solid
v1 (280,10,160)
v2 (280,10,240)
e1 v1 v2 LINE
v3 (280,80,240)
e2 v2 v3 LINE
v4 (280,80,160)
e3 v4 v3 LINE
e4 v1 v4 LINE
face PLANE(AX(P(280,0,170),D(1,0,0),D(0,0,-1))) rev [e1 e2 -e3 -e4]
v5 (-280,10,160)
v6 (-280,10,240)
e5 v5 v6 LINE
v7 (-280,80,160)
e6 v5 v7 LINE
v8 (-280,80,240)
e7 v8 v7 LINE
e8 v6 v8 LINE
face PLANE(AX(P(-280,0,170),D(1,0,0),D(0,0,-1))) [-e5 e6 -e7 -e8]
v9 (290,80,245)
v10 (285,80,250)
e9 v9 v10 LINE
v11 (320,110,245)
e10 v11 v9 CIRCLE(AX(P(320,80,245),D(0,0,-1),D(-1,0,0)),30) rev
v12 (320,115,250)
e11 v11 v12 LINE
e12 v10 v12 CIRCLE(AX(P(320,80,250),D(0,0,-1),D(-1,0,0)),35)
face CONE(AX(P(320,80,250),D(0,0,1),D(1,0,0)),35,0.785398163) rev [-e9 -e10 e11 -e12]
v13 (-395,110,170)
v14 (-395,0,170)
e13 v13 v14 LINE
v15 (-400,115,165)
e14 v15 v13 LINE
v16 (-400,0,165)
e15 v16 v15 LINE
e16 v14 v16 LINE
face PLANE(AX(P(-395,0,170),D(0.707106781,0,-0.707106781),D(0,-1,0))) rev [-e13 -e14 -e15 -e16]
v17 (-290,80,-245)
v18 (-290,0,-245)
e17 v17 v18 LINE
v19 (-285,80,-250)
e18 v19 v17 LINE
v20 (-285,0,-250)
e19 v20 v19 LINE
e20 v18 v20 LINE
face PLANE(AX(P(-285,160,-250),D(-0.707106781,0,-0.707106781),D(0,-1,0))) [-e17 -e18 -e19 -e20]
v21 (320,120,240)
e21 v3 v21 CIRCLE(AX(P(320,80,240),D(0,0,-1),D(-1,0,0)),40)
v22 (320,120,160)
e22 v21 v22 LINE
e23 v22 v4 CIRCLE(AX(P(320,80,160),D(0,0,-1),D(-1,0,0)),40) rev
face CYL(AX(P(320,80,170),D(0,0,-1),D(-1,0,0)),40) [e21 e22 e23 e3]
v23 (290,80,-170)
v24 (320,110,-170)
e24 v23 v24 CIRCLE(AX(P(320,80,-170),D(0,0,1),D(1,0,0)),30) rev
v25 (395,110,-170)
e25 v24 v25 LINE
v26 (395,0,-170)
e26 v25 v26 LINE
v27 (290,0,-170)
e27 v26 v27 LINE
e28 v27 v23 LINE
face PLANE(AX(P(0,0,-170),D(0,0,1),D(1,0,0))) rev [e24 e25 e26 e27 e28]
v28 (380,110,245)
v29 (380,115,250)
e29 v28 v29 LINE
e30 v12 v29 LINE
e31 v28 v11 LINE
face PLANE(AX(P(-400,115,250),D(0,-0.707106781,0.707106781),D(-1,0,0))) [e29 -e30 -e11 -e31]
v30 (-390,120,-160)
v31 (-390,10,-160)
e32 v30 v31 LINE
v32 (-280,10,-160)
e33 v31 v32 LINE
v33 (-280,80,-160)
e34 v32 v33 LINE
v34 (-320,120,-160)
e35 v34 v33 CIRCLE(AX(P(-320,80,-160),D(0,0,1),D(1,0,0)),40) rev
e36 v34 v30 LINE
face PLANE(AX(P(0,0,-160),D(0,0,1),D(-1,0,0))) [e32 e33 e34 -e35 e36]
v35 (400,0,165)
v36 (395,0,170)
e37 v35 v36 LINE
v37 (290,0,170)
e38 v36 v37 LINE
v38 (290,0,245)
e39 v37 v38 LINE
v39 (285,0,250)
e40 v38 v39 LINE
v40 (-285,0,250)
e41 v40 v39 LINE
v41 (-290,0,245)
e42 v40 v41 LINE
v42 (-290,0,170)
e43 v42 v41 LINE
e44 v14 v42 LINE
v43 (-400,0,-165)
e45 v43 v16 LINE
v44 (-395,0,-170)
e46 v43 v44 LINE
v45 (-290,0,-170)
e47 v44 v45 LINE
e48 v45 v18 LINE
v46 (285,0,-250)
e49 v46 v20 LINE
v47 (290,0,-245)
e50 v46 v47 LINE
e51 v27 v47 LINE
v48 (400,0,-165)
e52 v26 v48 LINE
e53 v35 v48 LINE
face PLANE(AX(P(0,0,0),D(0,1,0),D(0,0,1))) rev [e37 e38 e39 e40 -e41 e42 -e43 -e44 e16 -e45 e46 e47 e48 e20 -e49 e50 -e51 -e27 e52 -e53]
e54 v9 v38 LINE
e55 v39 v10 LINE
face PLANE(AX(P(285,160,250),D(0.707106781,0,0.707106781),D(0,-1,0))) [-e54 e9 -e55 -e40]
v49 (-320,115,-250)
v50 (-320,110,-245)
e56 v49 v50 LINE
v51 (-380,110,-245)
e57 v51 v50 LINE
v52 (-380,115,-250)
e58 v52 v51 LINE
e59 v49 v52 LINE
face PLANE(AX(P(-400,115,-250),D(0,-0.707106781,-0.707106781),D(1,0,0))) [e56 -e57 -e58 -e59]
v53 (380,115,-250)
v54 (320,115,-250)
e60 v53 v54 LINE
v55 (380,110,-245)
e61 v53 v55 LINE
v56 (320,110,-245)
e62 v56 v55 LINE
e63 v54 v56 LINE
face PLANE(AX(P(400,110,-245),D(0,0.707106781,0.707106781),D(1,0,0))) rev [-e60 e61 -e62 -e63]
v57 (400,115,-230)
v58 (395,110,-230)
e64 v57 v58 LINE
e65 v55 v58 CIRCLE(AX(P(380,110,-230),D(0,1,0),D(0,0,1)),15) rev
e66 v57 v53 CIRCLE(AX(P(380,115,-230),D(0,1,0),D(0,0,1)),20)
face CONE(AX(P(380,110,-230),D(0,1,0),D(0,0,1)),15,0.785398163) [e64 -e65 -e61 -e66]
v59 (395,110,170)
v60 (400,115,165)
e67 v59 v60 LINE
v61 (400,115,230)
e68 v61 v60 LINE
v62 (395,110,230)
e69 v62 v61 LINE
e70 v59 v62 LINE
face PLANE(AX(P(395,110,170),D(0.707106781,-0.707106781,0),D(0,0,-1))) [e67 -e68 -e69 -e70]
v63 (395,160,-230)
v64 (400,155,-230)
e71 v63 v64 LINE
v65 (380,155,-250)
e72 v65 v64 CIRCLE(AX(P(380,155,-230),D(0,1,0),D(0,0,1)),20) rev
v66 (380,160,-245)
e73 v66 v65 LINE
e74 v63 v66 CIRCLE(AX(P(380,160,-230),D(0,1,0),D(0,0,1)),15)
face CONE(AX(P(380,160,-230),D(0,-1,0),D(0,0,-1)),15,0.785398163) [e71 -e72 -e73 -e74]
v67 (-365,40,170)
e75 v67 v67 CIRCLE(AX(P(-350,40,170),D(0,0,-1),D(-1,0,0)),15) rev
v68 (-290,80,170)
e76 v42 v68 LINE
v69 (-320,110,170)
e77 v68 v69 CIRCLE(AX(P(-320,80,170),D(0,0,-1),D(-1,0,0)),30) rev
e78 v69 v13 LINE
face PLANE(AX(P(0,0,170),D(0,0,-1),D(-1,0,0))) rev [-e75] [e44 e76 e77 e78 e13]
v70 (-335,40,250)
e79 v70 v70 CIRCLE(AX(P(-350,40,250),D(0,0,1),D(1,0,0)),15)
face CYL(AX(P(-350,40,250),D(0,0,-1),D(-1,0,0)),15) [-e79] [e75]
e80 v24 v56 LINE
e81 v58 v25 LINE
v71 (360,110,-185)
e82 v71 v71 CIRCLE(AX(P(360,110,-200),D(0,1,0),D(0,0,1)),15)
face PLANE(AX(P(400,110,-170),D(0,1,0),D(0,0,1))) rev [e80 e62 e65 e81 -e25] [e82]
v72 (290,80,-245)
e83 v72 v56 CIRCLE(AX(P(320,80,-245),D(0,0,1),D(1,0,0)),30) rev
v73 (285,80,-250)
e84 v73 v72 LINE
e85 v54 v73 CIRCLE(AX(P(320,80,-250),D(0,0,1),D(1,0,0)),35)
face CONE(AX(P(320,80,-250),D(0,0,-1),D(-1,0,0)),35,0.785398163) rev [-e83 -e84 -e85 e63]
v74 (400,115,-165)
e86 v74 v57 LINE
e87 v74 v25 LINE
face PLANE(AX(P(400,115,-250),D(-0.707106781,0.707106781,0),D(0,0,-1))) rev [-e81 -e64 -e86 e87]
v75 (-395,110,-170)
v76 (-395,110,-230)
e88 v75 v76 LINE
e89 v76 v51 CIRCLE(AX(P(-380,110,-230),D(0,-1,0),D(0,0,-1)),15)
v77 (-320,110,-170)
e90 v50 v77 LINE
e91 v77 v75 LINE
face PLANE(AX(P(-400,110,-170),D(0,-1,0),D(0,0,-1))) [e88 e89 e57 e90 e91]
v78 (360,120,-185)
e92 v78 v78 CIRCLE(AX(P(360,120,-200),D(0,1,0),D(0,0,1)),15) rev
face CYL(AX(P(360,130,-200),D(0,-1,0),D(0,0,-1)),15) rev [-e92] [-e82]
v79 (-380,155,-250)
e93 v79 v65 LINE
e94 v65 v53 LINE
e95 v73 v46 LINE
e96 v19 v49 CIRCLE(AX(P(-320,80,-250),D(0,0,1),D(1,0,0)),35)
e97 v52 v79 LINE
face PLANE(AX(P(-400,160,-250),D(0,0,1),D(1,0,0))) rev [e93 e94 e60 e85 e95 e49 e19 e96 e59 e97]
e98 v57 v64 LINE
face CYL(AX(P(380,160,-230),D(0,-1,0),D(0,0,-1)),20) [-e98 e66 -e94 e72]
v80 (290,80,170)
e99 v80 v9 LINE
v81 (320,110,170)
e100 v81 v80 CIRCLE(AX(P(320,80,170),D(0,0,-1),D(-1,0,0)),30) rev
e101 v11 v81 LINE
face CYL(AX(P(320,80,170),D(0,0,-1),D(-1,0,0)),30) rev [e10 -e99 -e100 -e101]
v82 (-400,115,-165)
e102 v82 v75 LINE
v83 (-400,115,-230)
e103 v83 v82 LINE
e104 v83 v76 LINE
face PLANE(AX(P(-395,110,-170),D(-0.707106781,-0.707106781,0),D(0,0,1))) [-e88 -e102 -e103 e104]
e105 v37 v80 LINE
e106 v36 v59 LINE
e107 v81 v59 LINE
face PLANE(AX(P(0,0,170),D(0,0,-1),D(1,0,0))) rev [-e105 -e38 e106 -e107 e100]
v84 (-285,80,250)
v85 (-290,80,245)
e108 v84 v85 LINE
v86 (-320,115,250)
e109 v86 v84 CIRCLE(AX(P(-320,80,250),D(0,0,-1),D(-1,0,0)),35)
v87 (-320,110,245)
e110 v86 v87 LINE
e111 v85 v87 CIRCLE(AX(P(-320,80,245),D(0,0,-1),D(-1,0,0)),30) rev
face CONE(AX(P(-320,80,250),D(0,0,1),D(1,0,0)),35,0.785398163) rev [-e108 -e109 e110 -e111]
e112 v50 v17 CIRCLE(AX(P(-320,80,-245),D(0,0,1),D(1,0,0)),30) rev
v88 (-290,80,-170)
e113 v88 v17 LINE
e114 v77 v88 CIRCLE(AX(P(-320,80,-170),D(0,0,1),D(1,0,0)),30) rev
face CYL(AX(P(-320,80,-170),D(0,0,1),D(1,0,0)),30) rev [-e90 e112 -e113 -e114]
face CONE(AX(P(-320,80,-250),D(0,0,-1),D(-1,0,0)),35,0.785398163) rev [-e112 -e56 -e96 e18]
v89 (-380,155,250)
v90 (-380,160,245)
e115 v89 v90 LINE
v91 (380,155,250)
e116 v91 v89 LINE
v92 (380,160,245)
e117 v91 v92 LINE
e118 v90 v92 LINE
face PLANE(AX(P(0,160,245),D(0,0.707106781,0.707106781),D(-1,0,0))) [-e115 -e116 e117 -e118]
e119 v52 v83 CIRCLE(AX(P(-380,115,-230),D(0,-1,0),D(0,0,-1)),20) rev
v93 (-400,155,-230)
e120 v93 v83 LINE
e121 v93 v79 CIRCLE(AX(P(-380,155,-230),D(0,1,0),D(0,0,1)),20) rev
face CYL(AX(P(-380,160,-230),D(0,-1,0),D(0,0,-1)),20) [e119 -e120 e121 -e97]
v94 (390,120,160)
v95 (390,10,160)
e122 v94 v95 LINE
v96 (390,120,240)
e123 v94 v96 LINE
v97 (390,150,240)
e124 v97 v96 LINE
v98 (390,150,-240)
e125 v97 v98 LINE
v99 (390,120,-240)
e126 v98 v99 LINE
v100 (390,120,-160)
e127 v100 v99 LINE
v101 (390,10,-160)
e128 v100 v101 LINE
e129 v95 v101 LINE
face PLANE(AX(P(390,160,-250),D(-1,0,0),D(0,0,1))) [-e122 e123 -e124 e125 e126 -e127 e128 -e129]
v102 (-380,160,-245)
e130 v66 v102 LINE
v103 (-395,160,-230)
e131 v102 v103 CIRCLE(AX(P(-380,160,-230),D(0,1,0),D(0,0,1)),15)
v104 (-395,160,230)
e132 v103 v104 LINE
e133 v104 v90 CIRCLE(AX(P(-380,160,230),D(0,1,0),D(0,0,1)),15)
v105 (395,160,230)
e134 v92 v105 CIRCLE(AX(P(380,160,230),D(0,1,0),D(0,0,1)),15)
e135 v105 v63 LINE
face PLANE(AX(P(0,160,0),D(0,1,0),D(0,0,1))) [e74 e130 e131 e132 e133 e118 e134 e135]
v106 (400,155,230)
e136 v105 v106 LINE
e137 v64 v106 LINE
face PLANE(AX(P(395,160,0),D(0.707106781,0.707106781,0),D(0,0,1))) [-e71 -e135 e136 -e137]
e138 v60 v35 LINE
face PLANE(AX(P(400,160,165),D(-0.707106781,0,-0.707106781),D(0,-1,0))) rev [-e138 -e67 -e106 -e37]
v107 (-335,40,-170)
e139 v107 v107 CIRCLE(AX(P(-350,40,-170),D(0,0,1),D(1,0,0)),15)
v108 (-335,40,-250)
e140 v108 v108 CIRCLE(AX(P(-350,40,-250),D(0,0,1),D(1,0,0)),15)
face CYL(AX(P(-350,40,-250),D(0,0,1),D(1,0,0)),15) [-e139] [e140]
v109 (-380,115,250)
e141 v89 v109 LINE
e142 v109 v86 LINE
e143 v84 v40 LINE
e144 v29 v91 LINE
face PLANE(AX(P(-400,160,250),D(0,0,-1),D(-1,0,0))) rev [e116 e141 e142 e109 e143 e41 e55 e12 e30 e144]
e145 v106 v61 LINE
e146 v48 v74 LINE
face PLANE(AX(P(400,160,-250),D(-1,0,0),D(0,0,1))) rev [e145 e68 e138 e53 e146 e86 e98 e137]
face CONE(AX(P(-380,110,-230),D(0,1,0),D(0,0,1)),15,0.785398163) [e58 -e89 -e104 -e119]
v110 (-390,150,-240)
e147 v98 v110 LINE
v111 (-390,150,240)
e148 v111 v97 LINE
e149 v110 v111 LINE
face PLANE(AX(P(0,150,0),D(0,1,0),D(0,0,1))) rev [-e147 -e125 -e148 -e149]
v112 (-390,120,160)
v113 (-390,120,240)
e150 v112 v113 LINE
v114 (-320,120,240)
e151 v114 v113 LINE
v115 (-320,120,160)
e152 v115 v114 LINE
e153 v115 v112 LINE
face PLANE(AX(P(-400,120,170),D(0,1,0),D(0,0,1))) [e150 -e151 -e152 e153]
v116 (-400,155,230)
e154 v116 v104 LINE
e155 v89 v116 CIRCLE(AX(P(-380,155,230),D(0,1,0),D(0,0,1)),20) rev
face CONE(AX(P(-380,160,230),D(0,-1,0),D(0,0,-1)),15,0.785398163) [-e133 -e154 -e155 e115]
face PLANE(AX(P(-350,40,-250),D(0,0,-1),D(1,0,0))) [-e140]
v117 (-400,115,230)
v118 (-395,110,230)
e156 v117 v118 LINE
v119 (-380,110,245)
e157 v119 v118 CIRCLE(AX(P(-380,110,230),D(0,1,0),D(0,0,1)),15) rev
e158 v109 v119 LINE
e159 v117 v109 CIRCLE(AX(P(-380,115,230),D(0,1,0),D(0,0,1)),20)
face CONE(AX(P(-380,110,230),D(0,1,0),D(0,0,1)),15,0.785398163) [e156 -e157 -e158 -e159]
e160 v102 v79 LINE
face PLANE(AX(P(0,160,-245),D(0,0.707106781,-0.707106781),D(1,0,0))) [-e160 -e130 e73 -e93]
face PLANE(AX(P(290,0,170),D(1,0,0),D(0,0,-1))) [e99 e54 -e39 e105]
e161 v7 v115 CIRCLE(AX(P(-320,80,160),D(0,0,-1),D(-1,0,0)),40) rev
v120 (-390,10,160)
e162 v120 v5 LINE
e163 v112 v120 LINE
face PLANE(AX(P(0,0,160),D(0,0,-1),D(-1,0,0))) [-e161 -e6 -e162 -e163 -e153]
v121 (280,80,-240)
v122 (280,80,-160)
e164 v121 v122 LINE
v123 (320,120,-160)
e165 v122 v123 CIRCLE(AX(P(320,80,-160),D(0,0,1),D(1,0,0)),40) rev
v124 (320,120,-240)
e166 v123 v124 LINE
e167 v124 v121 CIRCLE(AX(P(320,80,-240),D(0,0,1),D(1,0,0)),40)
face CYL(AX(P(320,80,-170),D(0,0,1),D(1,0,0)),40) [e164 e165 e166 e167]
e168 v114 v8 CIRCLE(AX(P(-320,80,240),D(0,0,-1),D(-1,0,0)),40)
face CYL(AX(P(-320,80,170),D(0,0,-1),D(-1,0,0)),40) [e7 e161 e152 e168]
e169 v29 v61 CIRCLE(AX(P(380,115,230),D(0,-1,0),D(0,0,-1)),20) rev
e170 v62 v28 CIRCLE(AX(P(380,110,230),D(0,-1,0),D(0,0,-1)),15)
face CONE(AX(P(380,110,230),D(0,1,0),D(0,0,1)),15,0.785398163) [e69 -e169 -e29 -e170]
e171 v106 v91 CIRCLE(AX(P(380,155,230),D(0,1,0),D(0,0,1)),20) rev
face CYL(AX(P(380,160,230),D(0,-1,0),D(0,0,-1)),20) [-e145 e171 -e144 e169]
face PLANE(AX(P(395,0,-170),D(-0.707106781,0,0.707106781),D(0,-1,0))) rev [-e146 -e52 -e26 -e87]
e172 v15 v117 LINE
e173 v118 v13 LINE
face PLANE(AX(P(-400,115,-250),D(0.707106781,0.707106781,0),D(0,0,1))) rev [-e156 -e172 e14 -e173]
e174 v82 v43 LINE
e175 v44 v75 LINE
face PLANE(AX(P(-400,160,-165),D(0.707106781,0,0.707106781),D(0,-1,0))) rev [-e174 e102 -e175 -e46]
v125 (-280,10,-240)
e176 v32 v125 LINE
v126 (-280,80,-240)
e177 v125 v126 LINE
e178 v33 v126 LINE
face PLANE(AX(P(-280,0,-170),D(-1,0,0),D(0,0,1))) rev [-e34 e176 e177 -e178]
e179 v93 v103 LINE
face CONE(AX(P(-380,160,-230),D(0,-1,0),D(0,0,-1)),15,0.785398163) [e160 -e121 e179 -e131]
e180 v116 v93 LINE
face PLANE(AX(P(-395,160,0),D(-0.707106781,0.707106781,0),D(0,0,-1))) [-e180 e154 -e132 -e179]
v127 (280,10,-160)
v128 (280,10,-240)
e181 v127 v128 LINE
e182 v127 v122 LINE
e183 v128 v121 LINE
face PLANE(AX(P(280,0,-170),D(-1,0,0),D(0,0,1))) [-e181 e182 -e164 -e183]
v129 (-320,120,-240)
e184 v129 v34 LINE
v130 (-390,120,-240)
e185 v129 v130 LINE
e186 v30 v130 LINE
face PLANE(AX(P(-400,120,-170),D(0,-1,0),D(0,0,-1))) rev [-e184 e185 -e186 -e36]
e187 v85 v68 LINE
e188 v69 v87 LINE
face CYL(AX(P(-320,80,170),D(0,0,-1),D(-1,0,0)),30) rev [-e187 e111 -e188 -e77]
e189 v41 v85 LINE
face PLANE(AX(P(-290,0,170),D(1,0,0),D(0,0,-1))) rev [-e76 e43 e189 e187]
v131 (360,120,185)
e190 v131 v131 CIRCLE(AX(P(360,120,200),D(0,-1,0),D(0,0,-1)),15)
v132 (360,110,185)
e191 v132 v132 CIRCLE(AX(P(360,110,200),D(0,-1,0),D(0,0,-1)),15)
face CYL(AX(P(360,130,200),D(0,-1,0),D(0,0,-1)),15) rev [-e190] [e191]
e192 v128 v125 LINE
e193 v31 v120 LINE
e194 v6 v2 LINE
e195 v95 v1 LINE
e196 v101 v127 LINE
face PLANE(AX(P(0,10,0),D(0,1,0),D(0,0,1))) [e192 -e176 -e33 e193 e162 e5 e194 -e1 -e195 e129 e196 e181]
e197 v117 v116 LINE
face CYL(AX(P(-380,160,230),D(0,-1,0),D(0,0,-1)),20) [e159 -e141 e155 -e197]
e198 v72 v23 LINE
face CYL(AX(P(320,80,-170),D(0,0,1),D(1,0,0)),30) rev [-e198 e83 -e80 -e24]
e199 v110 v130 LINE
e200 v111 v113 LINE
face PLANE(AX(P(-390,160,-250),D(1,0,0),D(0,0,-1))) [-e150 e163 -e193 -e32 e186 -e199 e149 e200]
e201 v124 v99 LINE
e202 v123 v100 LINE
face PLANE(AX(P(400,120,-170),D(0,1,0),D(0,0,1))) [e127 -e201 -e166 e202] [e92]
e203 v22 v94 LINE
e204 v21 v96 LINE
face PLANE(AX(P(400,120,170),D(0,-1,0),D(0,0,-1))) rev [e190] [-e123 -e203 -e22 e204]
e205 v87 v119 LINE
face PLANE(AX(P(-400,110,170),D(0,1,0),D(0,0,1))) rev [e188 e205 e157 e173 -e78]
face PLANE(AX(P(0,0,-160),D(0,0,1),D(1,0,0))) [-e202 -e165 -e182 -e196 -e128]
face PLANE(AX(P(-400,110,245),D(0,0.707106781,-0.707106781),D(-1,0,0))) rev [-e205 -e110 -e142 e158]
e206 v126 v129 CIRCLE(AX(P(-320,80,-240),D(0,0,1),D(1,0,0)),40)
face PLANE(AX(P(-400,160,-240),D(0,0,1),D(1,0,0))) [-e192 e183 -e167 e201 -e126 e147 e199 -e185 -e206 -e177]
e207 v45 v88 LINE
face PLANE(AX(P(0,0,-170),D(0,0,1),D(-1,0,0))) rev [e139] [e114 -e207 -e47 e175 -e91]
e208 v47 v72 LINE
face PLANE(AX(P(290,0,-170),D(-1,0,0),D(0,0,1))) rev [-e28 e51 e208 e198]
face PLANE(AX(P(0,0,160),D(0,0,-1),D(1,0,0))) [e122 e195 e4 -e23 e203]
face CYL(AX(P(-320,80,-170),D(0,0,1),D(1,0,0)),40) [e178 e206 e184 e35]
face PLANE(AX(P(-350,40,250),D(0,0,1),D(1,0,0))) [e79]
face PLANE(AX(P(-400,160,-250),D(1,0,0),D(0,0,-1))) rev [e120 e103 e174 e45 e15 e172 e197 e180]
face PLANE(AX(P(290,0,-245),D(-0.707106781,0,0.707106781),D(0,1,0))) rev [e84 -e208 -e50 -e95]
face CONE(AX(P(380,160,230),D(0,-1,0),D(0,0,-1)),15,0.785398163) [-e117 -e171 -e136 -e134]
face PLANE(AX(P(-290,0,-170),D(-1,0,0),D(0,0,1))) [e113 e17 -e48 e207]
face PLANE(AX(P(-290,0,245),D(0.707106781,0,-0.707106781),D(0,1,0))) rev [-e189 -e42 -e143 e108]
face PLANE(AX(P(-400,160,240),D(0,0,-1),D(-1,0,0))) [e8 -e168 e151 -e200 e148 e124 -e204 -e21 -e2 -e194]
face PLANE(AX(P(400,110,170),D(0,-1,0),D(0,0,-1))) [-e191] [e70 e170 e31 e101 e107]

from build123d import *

# Parameters (mm, degrees)
SKETCH1_W            = 800
SKETCH1_H            = 500
BOSS_EXTRUDE1_DEPTH  = 160
SKETCH3_W            = 110
SKETCH3_H            = 110
CUT_EXTRUDE1_DEPTH   = 80
FILLET1_R            = 30
FILLET1_OF_MIRROR1_R = 30
MIRROR2_START        = -250
MIRROR2_DEPTH        = 80
SHELL2_START         = -240
SHELL2_DEPTH         = 480
SHELL2_START_2       = -160
SHELL2_2_DEPTH       = 320
FILLET2_R            = 20
CHAMFER1_SIZE        = 5
CHAMFER2_SIZE        = 5
SKETCH7_R            = 15
BOSS_EXTRUDE2_DEPTH  = 80
SKETCH8_R            = 15
CUT_EXTRUDE2_DEPTH   = 20


# Read off the part's stored shape, not the designer's step: Mirror2, Shell2
with BuildPart() as part:
    # Sketch1 → Boss-Extrude1 (new body)
    with BuildSketch(Plane(origin=(0, 0, 0), x_dir=(1, 0, 0), z_dir=(0, 1, 0))):
        Rectangle(SKETCH1_W, SKETCH1_H)
    extrude(amount=BOSS_EXTRUDE1_DEPTH)

    # Sketch3 → Cut-Extrude1 (cut)
    with BuildSketch(Plane.XY.offset(250)):
        with Locations((-345, 55)):
            Rectangle(SKETCH3_W, SKETCH3_H)
    cut_extrude1 = extrude(amount=-CUT_EXTRUDE1_DEPTH, mode=Mode.SUBTRACT)

    # Fillet1
    fillet1_edges = [part.edges().sort_by_distance(p)[0] for p in [
        (-290, 110, 210),
    ]]
    fillet(fillet1_edges, radius=FILLET1_R)

    # Mirror1: Cut-Extrude1 across plane
    add(cut_extrude1.mirror(Plane(origin=(0, 0, 0), x_dir=(0, 0, 1), z_dir=(1, 0, 0))), mode=Mode.SUBTRACT)

    # Fillet1 of Mirror1
    fillet1_of_mirror1_edges = [part.edges().sort_by_distance(p)[0] for p in [
        (290, 110, 210),
    ]]
    fillet(fillet1_of_mirror1_edges, radius=FILLET1_OF_MIRROR1_R)

    # Mirror2 outline → Mirror2 (cut)
    with BuildSketch(Plane.XY.offset(MIRROR2_START)):
        with BuildLine():
            Line((400, 0), (400, 110))
            Line((400, 110), (320, 110))
            ThreePointArc((320, 110), (298.786796564, 101.213203436), (290, 80))
            Line((290, 80), (290, 0))
            Line((290, 0), (400, 0))
        make_face()
        with BuildLine():
            Line((-400, 0), (-290, 0))
            Line((-290, 0), (-290, 80))
            ThreePointArc((-290, 80), (-298.786796564, 101.213203436), (-320, 110))
            Line((-320, 110), (-400, 110))
            Line((-400, 110), (-400, 0))
        make_face()
    extrude(amount=MIRROR2_DEPTH, mode=Mode.SUBTRACT)

    # Shell2 outline → Shell2 (cut)
    with BuildSketch(Plane.XY.offset(SHELL2_START)):
        with BuildLine():
            Line((-280, 10), (280, 10))
            Line((280, 10), (280, 80))
            ThreePointArc((280, 80), (291.715728753, 108.284271247), (320, 120))
            Line((320, 120), (390, 120))
            Line((390, 120), (390, 150))
            Line((390, 150), (-390, 150))
            Line((-390, 150), (-390, 120))
            Line((-390, 120), (-320, 120))
            ThreePointArc((-320, 120), (-291.715728753, 108.284271247), (-280, 80))
            Line((-280, 80), (-280, 10))
        make_face()
    extrude(amount=SHELL2_DEPTH, mode=Mode.SUBTRACT)

    # Shell2 2 outline → Shell2 2 (cut)
    with BuildSketch(Plane.XY.offset(SHELL2_START_2)):
        with BuildLine():
            Line((280, 10), (390, 10))
            Line((390, 10), (390, 120))
            Line((390, 120), (320, 120))
            ThreePointArc((320, 120), (291.715728753, 108.284271247), (280, 80))
            Line((280, 80), (280, 10))
        make_face()
        with BuildLine():
            Line((-390, 10), (-280, 10))
            Line((-280, 10), (-280, 80))
            ThreePointArc((-280, 80), (-291.715728753, 108.284271247), (-320, 120))
            Line((-320, 120), (-390, 120))
            Line((-390, 120), (-390, 10))
        make_face()
    extrude(amount=SHELL2_2_DEPTH, mode=Mode.SUBTRACT)

    # Fillet2
    fillet2_edges = [part.edges().sort_by_distance(p)[0] for p in [
        (400, 135, 250),
        (-400, 135, 250),
        (-400, 135, -250),
        (400, 135, -250),
    ]]
    fillet(fillet2_edges, radius=FILLET2_R)

    # Chamfer1
    chamfer1_edges = [part.edges().sort_by_distance(p)[0] for p in [
        (-394.142135624, 110, 244.142135624),
        (394.142135624, 110, 244.142135624),
        (394.142135624, 110, -244.142135624),
        (-394.142135624, 110, -244.142135624),
        (-400, 55, 170),
        (-400, 110, 200),
        (-290, 40, 250),
        (-350, 110, 250),
        (-298.786796564, 101.213203436, 250),
        (400, 110, 200),
        (290, 40, 250),
        (400, 55, 170),
        (350, 110, 250),
        (298.786796564, 101.213203436, 250),
        (400, 55, -170),
        (400, 110, -200),
        (290, 40, -250),
        (350, 110, -250),
        (298.786796564, 101.213203436, -250),
        (-400, 110, -200),
        (-290, 40, -250),
        (-400, 55, -170),
        (-350, 110, -250),
        (-298.786796564, 101.213203436, -250),
    ]]
    chamfer(chamfer1_edges, length=CHAMFER1_SIZE)

    # Chamfer2
    chamfer2_edges = [part.edges().sort_by_distance(p)[0] for p in [
        (0, 160, 250),
        (-400, 160, 0),
        (400, 160, 0),
        (0, 160, -250),
        (-394.142135624, 160, -244.142135624),
        (394.142135624, 160, -244.142135624),
        (394.142135624, 160, 244.142135624),
        (-394.142135624, 160, 244.142135624),
    ]]
    chamfer(chamfer2_edges, length=CHAMFER2_SIZE)

    # Sketch7 → Boss-Extrude2 (add)
    with BuildSketch(Plane.XY.offset(170)):
        with Locations(Location((-350, 40, 0), (0, 0, 180))):
            Circle(SKETCH7_R)
    boss_extrude2 = extrude(amount=BOSS_EXTRUDE2_DEPTH)

    # Mirror3: Boss-Extrude2 across plane
    add(boss_extrude2.mirror(Plane.XY))

    # Sketch8 → Cut-Extrude2 (cut)
    with BuildSketch(Plane.XZ.offset(-110)):
        with Locations(Location((360, 200, 0), (0, 0, 270))):
            Circle(SKETCH8_R)
    cut_extrude2 = extrude(amount=-CUT_EXTRUDE2_DEPTH, mode=Mode.SUBTRACT)

    # Mirror4: Cut-Extrude2 across plane
    add(cut_extrude2.mirror(Plane.XY), mode=Mode.SUBTRACT)


solid = part.part
